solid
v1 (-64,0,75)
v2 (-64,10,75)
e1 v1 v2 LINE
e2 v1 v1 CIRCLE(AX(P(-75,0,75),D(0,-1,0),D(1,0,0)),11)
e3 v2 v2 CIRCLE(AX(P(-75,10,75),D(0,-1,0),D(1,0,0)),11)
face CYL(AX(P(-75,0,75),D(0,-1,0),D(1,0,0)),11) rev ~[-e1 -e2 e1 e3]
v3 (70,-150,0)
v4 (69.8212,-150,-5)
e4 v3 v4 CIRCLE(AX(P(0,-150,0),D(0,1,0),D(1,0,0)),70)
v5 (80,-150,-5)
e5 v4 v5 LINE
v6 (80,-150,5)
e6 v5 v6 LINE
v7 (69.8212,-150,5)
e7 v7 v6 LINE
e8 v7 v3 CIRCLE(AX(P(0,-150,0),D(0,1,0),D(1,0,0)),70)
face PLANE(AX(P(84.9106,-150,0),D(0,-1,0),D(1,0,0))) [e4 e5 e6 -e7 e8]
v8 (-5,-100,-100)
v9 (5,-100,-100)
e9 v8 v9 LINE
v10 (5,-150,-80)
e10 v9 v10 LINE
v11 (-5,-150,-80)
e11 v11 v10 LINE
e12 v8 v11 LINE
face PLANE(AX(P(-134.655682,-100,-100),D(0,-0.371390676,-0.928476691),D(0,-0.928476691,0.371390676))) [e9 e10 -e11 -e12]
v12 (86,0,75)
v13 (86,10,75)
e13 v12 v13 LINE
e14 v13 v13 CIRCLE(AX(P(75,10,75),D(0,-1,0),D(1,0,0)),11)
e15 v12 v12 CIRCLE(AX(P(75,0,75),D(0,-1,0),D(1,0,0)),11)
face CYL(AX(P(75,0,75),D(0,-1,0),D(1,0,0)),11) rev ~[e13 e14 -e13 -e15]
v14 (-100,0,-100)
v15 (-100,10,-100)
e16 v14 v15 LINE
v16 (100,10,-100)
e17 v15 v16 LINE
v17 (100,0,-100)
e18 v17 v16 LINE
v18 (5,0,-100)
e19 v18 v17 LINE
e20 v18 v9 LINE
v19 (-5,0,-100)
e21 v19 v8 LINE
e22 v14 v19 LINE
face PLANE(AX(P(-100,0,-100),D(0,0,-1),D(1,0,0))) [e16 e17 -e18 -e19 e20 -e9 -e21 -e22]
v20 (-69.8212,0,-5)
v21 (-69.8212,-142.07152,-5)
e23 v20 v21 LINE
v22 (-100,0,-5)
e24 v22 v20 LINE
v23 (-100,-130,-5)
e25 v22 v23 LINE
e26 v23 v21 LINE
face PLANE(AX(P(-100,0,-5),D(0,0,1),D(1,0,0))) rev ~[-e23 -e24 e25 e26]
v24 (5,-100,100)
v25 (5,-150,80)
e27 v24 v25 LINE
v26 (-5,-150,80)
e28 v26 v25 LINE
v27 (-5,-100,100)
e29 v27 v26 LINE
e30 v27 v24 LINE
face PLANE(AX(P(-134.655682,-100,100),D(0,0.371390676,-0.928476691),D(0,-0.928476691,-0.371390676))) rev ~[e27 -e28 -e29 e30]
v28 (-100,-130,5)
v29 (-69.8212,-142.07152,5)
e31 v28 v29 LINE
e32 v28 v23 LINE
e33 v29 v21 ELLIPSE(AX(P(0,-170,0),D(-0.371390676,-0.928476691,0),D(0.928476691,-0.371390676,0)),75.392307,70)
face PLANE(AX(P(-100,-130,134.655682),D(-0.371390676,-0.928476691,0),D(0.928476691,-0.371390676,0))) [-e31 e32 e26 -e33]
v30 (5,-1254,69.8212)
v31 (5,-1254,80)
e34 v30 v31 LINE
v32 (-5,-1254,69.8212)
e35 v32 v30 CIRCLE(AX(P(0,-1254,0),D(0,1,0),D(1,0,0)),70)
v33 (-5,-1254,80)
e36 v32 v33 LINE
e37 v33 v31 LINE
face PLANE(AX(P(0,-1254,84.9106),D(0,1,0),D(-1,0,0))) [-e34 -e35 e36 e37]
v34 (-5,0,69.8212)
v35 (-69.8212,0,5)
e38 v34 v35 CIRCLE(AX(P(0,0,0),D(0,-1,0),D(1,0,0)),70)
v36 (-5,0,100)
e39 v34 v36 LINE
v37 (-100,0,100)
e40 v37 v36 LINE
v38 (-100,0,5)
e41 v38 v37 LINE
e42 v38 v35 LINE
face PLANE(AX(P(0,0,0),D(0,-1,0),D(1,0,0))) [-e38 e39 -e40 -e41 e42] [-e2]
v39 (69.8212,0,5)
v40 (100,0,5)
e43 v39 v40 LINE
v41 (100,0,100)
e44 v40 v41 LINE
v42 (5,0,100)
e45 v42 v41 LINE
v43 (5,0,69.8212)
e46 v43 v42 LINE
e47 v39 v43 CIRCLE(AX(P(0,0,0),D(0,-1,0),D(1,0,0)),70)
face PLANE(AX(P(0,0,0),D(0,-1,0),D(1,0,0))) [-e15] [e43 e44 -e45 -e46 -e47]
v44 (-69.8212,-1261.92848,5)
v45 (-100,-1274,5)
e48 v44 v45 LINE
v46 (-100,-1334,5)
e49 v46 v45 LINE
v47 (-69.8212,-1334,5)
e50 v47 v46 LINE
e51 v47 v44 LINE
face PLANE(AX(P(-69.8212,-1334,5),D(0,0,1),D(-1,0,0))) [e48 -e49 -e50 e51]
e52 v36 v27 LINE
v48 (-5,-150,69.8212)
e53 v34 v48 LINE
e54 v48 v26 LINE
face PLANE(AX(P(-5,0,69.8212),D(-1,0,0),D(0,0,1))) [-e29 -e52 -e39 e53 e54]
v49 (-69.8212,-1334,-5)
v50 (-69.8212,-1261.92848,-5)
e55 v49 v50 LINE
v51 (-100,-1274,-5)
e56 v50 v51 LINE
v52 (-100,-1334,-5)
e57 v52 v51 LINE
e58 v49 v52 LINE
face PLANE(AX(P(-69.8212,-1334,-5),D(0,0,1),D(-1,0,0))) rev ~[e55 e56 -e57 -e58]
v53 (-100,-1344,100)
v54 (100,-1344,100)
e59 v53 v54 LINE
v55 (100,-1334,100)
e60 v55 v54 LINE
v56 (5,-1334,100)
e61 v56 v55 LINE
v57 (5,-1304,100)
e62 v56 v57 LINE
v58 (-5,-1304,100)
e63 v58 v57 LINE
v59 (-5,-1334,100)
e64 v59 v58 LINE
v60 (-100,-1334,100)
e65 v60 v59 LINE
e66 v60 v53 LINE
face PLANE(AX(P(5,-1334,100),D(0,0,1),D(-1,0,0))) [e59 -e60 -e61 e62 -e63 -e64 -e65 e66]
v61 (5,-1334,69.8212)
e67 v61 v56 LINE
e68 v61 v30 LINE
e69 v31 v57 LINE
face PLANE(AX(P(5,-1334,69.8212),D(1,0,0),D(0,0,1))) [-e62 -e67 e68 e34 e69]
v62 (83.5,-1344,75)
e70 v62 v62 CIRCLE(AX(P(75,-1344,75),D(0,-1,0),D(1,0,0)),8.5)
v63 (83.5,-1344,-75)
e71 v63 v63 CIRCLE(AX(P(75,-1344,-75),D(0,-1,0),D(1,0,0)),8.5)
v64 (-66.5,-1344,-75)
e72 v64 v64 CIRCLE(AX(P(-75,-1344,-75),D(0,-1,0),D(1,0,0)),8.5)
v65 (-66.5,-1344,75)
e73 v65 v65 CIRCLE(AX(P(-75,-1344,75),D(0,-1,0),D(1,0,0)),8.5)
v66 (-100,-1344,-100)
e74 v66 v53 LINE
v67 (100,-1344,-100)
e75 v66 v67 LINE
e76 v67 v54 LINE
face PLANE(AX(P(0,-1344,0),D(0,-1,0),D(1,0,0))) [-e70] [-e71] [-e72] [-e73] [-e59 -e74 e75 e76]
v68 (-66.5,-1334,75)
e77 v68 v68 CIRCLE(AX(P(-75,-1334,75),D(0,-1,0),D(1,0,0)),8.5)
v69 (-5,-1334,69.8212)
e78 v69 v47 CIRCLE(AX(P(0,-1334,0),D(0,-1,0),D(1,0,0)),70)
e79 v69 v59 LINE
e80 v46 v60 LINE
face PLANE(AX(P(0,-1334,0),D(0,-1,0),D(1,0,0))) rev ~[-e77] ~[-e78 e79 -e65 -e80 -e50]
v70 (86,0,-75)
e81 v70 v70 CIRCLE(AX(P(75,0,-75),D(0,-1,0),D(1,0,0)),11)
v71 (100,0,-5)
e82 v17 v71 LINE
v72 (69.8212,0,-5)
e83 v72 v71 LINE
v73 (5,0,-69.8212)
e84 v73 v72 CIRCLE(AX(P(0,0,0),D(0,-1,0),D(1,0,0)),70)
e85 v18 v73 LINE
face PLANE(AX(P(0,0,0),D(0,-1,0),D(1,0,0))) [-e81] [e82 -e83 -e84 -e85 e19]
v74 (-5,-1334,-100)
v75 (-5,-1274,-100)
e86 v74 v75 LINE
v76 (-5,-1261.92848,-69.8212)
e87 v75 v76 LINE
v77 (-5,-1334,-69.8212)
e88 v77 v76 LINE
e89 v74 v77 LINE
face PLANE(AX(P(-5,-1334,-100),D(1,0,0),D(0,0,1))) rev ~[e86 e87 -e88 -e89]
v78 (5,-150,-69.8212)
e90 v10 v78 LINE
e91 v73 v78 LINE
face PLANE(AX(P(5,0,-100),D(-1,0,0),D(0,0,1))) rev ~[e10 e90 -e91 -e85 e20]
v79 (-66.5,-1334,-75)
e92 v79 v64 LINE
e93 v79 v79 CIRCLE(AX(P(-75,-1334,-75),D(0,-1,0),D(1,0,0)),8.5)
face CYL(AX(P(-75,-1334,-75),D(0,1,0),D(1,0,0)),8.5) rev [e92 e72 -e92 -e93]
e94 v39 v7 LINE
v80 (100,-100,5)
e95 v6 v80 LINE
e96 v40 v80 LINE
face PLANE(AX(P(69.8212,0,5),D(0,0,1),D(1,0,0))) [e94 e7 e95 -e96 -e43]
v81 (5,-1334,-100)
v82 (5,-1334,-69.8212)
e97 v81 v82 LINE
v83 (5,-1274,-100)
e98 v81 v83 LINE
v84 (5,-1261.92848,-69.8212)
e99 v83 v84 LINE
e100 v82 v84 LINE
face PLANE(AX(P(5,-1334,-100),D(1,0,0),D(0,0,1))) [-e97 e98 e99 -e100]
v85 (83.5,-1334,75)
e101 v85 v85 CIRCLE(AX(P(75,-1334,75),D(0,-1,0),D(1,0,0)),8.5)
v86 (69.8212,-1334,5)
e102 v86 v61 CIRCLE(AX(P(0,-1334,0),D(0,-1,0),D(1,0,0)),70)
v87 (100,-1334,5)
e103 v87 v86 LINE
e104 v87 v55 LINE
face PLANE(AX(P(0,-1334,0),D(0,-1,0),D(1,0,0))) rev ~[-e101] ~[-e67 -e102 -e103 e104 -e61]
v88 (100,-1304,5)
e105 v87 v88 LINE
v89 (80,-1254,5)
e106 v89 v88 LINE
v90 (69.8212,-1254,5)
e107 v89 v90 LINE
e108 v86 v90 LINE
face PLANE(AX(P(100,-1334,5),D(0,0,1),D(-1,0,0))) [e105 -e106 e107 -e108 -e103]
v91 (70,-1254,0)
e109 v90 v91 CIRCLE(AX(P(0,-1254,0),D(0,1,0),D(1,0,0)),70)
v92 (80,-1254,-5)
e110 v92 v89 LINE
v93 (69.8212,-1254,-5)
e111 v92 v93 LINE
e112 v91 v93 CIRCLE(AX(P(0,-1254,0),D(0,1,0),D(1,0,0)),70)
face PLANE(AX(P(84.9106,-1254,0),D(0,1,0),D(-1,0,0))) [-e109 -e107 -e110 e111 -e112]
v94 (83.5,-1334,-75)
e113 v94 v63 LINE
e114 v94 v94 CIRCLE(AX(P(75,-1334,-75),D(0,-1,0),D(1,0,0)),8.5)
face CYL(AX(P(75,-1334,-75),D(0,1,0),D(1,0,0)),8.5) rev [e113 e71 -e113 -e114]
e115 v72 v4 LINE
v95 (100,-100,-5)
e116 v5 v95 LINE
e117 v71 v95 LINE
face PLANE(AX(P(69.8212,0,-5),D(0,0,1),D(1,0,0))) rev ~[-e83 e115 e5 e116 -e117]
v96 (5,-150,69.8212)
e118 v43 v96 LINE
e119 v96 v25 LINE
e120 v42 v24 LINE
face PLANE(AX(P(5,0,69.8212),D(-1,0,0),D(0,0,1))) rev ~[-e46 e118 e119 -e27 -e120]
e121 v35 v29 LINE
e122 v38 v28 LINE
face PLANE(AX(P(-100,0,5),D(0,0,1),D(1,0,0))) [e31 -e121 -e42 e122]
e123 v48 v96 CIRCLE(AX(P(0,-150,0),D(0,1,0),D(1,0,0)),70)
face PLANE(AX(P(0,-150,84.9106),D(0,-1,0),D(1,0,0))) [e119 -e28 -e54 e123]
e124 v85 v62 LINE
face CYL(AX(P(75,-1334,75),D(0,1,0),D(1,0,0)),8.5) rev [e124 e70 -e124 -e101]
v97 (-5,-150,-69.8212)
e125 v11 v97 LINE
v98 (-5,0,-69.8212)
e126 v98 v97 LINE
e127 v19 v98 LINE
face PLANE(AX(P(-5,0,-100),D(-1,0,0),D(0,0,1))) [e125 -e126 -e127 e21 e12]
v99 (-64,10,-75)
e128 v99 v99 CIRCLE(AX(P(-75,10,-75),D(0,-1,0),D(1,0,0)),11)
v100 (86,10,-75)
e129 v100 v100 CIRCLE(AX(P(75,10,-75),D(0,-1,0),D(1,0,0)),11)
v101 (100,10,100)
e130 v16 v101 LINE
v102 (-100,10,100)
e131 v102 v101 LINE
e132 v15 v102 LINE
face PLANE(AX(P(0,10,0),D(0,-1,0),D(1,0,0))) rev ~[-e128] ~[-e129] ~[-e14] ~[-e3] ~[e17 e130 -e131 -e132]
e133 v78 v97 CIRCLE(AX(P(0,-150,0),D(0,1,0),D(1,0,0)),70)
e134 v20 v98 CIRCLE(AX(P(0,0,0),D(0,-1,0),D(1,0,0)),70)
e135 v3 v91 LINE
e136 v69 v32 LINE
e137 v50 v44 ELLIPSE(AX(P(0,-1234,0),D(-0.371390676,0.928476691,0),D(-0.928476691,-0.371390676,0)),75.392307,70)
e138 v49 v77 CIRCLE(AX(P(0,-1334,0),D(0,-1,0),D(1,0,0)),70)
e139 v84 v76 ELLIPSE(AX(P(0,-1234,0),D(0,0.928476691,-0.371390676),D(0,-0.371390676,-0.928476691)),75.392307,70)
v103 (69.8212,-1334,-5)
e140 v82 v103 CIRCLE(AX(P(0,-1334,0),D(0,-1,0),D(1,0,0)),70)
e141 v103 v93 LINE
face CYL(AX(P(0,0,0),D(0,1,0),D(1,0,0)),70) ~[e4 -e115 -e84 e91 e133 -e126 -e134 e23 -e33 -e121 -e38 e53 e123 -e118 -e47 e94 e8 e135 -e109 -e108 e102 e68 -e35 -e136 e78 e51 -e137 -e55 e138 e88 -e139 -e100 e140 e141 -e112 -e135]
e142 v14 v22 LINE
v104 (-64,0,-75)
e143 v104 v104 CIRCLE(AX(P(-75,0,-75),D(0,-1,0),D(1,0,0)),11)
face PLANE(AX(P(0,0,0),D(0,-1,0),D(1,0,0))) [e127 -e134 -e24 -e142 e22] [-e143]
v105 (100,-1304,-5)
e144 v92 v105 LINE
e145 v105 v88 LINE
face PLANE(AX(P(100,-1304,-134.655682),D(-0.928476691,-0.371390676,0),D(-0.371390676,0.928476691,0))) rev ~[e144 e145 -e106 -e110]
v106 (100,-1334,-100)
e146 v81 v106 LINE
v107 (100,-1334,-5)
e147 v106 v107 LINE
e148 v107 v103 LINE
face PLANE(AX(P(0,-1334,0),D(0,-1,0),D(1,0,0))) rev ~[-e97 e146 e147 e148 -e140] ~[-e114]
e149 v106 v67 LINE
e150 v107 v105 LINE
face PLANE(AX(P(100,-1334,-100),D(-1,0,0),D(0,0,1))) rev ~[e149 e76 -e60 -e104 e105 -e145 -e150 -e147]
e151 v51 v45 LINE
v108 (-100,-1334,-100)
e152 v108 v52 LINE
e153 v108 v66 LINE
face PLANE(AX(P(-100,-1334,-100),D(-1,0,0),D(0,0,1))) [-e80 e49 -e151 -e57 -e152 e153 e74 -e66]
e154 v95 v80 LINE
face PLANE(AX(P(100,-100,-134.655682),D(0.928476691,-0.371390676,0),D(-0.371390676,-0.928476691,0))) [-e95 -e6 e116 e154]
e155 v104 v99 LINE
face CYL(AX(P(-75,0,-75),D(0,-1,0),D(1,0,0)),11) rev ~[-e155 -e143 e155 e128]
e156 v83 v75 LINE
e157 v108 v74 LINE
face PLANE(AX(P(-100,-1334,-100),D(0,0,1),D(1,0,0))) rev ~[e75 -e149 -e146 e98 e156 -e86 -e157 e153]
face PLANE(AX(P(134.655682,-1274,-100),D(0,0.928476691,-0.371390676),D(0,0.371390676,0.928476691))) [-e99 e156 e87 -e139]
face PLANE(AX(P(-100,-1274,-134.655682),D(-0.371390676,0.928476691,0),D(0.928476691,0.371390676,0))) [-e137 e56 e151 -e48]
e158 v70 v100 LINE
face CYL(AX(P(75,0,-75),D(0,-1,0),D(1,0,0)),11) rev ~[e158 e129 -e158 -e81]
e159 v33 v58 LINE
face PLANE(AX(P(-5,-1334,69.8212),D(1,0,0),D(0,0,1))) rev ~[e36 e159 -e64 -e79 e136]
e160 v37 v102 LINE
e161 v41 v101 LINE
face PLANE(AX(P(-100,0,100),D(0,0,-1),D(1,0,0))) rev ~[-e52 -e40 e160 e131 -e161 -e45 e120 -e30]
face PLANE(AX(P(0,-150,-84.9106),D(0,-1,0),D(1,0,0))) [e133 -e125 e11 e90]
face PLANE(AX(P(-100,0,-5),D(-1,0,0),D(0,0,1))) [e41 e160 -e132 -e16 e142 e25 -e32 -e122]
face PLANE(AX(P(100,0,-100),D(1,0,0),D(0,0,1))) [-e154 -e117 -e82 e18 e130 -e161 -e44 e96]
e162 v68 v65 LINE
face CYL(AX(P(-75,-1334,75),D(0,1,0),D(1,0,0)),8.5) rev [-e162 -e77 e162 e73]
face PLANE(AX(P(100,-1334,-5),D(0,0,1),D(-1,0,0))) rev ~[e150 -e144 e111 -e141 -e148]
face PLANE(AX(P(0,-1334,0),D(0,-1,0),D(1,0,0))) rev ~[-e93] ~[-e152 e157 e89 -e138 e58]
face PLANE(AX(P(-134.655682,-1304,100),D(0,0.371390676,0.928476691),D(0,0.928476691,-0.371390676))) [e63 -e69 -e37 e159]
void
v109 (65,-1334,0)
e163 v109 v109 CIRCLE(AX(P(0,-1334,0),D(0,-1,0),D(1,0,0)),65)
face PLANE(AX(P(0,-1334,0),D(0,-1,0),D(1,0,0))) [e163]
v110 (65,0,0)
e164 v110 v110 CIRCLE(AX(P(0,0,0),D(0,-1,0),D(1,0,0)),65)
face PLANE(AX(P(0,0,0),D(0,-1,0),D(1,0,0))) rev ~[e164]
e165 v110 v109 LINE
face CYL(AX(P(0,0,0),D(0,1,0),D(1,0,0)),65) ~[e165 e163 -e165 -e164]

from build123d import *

# Parameters (mm, degrees)
F0_R          = 70
F0_R_2        = 65
F1_DEPTH      = 1334
F2_W          = 200
F2_H          = 200
F2_R          = 11
F3_DEPTH      = 10
F4_W          = 30.1787997812
F4_H          = 10
F4_W_2        = 10
F4_H_2        = 30.1787997812
F5_DEPTH      = 150
F6_T1_DEPTH   = 269.311363913
F6_T3_DEPTH   = 269.311363913
F6_T8_DEPTH   = 269.311363913
F6_S9_R       = 70
F6_T10_DEPTH  = 139
F8_W          = 200
F8_H          = 200
F8_R          = 8.5
F9_DEPTH      = 10
F10_W         = 10
F10_H         = 30.1787997812
F10_W_2       = 30.1787997812
F10_H_2       = 10
F11_DEPTH     = 80
F12_T1_DEPTH  = 269.311363913
F12_T3_DEPTH  = 269.311363913
F12_T8_DEPTH  = 269.311363913
F12_S9_R      = 70
F12_T10_DEPTH = 139
F12_T14_DEPTH = 269.311363913
F12_S15_R     = 70
F12_T16_DEPTH = 139


# Not quite as in the source:
# - a fillet or chamfer that OpenCascade refuses, or shapes differently, is made with other operations: its cross-section is extruded or revolved along the edge and cut away or added


with BuildPart() as f1:
    # F0 (on Front) → F1 (new body)
    with BuildSketch(Plane.XZ):
        Circle(F0_R)
        Circle(F0_R_2, mode=Mode.SUBTRACT)
    extrude(amount=F1_DEPTH)

    # F2 (on Front) → F3 (join)
    with BuildSketch(Plane.XZ):
        Rectangle(F2_W, F2_H)
        with Locations((-75, -75)):
            Circle(F2_R, mode=Mode.SUBTRACT)
        with Locations((75, -75)):
            Circle(F2_R, mode=Mode.SUBTRACT)
        with Locations((-75, 75)):
            Circle(F2_R, mode=Mode.SUBTRACT)
        with Locations((75, 75)):
            Circle(F2_R, mode=Mode.SUBTRACT)
    extrude(amount=-F3_DEPTH)

    # F4 (on Front) → F5 (join)
    with BuildSketch(Plane.XZ):
        with Locations((-84.9106001094, 0)):
            Rectangle(F4_W, F4_H)
        with Locations((0, 84.9106001094)):
            Rectangle(F4_W_2, F4_H_2)
        with Locations((84.9106001094, 0)):
            Rectangle(F4_W, F4_H)
        with Locations((0, -84.9106001094)):
            Rectangle(F4_W_2, F4_H_2)
    extrude(amount=F5_DEPTH)

    # F6: chamfer of 50 x 20 on 4 edges, made by hand

    # F6_s2 → F6_t1 (cut)
    with BuildSketch(Plane.YZ.offset(-134.6556819565)):
        Polygon((-100, 100), (-150, 80), (-150, 100), align=None)
        Polygon((-100, -100), (-150, -80), (-150, -100), align=None)
    extrude(amount=F6_T1_DEPTH, mode=Mode.SUBTRACT)

    # F6_s4 → F6_t3 (cut)
    with BuildSketch(Plane.XY.offset(-134.6556819565)):
        Polygon((100, -100), (80, -150), (100, -150), align=None)
    extrude(amount=F6_T3_DEPTH, mode=Mode.SUBTRACT)


with BuildPart() as f6_tool6:
    # F6_s7 → F6_t8 (new body)
    with BuildSketch(Plane.XY.offset(134.6556819565)):
        Polygon((-100, -130), (-50, -150), (-100, -150), align=None)
    extrude(amount=-F6_T8_DEPTH)

    # F6_s9 → F6_t10 (cut, symmetric)
    with BuildSketch(Plane.XZ.offset(140)):
        Circle(F6_S9_R)
    extrude(amount=F6_T10_DEPTH, both=True, mode=Mode.SUBTRACT)


with BuildPart() as f1_1:
    add(f1.part)

    # F6_t5: cut F6_tool6
    add(f6_tool6.part, mode=Mode.SUBTRACT)

    # F8 (on offset) → F9 (join)
    with BuildSketch(Plane.XZ.offset(1334)):
        Rectangle(F8_W, F8_H)
        with Locations((-75, -75)):
            Circle(F8_R, mode=Mode.SUBTRACT)
        with Locations((75, -75)):
            Circle(F8_R, mode=Mode.SUBTRACT)
        with Locations((-75, 75)):
            Circle(F8_R, mode=Mode.SUBTRACT)
        with Locations((75, 75)):
            Circle(F8_R, mode=Mode.SUBTRACT)
    extrude(amount=F9_DEPTH)

    # F10 (on face) → F11 (join)
    with BuildSketch(Plane(origin=(0, -1334, 0), x_dir=(-1, 0, 0), z_dir=(0, 1, 0))):
        with Locations((0, 84.9106001094)):
            Rectangle(F10_W, F10_H)
        with Locations((84.9106001094, 0)):
            Rectangle(F10_W_2, F10_H_2)
        with Locations((0, -84.9106001094)):
            Rectangle(F10_W, F10_H)
        with Locations((-84.9106001094, 0)):
            Rectangle(F10_W_2, F10_H_2)
    extrude(amount=F11_DEPTH)

    # F12: chamfer of 20 x 50 on 4 edges, made by hand

    # F12_s2 → F12_t1 (cut)
    with BuildSketch(Plane.YZ.offset(-134.6556819565)):
        Polygon((-1304, 100), (-1254, 80), (-1254, 100), align=None)
    extrude(amount=F12_T1_DEPTH, mode=Mode.SUBTRACT)

    # F12_s4 → F12_t3 (cut)
    with BuildSketch(Plane.XY.offset(-134.6556819565)):
        Polygon((100, -1304), (80, -1254), (100, -1254), align=None)
    extrude(amount=F12_T3_DEPTH, mode=Mode.SUBTRACT)


with BuildPart() as f12_tool6:
    # F12_s7 → F12_t8 (new body)
    with BuildSketch(Plane.XY.offset(-134.6556819565)):
        Polygon((-100, -1274), (-50, -1254), (-100, -1254), align=None)
    extrude(amount=F12_T8_DEPTH)

    # F12_s9 → F12_t10 (cut, symmetric)
    with BuildSketch(Plane.XZ.offset(1264)):
        Circle(F12_S9_R)
    extrude(amount=F12_T10_DEPTH, both=True, mode=Mode.SUBTRACT)


with BuildPart() as f1_2:
    add(f1_1.part)

    # F12_t5: cut F12_tool6
    add(f12_tool6.part, mode=Mode.SUBTRACT)


with BuildPart() as f12_tool12:
    # F12_s13 → F12_t14 (new body)
    with BuildSketch(Plane.YZ.offset(134.6556819565)):
        Polygon((-1274, -100), (-1254, -50), (-1254, -100), align=None)
    extrude(amount=-F12_T14_DEPTH)

    # F12_s15 → F12_t16 (cut, symmetric)
    with BuildSketch(Plane.XZ.offset(1264)):
        Circle(F12_S15_R)
    extrude(amount=F12_T16_DEPTH, both=True, mode=Mode.SUBTRACT)


with BuildPart() as f1_3:
    add(f1_2.part)

    # F12_t11: cut F12_tool12
    add(f12_tool12.part, mode=Mode.SUBTRACT)


solid = f1_3.part
